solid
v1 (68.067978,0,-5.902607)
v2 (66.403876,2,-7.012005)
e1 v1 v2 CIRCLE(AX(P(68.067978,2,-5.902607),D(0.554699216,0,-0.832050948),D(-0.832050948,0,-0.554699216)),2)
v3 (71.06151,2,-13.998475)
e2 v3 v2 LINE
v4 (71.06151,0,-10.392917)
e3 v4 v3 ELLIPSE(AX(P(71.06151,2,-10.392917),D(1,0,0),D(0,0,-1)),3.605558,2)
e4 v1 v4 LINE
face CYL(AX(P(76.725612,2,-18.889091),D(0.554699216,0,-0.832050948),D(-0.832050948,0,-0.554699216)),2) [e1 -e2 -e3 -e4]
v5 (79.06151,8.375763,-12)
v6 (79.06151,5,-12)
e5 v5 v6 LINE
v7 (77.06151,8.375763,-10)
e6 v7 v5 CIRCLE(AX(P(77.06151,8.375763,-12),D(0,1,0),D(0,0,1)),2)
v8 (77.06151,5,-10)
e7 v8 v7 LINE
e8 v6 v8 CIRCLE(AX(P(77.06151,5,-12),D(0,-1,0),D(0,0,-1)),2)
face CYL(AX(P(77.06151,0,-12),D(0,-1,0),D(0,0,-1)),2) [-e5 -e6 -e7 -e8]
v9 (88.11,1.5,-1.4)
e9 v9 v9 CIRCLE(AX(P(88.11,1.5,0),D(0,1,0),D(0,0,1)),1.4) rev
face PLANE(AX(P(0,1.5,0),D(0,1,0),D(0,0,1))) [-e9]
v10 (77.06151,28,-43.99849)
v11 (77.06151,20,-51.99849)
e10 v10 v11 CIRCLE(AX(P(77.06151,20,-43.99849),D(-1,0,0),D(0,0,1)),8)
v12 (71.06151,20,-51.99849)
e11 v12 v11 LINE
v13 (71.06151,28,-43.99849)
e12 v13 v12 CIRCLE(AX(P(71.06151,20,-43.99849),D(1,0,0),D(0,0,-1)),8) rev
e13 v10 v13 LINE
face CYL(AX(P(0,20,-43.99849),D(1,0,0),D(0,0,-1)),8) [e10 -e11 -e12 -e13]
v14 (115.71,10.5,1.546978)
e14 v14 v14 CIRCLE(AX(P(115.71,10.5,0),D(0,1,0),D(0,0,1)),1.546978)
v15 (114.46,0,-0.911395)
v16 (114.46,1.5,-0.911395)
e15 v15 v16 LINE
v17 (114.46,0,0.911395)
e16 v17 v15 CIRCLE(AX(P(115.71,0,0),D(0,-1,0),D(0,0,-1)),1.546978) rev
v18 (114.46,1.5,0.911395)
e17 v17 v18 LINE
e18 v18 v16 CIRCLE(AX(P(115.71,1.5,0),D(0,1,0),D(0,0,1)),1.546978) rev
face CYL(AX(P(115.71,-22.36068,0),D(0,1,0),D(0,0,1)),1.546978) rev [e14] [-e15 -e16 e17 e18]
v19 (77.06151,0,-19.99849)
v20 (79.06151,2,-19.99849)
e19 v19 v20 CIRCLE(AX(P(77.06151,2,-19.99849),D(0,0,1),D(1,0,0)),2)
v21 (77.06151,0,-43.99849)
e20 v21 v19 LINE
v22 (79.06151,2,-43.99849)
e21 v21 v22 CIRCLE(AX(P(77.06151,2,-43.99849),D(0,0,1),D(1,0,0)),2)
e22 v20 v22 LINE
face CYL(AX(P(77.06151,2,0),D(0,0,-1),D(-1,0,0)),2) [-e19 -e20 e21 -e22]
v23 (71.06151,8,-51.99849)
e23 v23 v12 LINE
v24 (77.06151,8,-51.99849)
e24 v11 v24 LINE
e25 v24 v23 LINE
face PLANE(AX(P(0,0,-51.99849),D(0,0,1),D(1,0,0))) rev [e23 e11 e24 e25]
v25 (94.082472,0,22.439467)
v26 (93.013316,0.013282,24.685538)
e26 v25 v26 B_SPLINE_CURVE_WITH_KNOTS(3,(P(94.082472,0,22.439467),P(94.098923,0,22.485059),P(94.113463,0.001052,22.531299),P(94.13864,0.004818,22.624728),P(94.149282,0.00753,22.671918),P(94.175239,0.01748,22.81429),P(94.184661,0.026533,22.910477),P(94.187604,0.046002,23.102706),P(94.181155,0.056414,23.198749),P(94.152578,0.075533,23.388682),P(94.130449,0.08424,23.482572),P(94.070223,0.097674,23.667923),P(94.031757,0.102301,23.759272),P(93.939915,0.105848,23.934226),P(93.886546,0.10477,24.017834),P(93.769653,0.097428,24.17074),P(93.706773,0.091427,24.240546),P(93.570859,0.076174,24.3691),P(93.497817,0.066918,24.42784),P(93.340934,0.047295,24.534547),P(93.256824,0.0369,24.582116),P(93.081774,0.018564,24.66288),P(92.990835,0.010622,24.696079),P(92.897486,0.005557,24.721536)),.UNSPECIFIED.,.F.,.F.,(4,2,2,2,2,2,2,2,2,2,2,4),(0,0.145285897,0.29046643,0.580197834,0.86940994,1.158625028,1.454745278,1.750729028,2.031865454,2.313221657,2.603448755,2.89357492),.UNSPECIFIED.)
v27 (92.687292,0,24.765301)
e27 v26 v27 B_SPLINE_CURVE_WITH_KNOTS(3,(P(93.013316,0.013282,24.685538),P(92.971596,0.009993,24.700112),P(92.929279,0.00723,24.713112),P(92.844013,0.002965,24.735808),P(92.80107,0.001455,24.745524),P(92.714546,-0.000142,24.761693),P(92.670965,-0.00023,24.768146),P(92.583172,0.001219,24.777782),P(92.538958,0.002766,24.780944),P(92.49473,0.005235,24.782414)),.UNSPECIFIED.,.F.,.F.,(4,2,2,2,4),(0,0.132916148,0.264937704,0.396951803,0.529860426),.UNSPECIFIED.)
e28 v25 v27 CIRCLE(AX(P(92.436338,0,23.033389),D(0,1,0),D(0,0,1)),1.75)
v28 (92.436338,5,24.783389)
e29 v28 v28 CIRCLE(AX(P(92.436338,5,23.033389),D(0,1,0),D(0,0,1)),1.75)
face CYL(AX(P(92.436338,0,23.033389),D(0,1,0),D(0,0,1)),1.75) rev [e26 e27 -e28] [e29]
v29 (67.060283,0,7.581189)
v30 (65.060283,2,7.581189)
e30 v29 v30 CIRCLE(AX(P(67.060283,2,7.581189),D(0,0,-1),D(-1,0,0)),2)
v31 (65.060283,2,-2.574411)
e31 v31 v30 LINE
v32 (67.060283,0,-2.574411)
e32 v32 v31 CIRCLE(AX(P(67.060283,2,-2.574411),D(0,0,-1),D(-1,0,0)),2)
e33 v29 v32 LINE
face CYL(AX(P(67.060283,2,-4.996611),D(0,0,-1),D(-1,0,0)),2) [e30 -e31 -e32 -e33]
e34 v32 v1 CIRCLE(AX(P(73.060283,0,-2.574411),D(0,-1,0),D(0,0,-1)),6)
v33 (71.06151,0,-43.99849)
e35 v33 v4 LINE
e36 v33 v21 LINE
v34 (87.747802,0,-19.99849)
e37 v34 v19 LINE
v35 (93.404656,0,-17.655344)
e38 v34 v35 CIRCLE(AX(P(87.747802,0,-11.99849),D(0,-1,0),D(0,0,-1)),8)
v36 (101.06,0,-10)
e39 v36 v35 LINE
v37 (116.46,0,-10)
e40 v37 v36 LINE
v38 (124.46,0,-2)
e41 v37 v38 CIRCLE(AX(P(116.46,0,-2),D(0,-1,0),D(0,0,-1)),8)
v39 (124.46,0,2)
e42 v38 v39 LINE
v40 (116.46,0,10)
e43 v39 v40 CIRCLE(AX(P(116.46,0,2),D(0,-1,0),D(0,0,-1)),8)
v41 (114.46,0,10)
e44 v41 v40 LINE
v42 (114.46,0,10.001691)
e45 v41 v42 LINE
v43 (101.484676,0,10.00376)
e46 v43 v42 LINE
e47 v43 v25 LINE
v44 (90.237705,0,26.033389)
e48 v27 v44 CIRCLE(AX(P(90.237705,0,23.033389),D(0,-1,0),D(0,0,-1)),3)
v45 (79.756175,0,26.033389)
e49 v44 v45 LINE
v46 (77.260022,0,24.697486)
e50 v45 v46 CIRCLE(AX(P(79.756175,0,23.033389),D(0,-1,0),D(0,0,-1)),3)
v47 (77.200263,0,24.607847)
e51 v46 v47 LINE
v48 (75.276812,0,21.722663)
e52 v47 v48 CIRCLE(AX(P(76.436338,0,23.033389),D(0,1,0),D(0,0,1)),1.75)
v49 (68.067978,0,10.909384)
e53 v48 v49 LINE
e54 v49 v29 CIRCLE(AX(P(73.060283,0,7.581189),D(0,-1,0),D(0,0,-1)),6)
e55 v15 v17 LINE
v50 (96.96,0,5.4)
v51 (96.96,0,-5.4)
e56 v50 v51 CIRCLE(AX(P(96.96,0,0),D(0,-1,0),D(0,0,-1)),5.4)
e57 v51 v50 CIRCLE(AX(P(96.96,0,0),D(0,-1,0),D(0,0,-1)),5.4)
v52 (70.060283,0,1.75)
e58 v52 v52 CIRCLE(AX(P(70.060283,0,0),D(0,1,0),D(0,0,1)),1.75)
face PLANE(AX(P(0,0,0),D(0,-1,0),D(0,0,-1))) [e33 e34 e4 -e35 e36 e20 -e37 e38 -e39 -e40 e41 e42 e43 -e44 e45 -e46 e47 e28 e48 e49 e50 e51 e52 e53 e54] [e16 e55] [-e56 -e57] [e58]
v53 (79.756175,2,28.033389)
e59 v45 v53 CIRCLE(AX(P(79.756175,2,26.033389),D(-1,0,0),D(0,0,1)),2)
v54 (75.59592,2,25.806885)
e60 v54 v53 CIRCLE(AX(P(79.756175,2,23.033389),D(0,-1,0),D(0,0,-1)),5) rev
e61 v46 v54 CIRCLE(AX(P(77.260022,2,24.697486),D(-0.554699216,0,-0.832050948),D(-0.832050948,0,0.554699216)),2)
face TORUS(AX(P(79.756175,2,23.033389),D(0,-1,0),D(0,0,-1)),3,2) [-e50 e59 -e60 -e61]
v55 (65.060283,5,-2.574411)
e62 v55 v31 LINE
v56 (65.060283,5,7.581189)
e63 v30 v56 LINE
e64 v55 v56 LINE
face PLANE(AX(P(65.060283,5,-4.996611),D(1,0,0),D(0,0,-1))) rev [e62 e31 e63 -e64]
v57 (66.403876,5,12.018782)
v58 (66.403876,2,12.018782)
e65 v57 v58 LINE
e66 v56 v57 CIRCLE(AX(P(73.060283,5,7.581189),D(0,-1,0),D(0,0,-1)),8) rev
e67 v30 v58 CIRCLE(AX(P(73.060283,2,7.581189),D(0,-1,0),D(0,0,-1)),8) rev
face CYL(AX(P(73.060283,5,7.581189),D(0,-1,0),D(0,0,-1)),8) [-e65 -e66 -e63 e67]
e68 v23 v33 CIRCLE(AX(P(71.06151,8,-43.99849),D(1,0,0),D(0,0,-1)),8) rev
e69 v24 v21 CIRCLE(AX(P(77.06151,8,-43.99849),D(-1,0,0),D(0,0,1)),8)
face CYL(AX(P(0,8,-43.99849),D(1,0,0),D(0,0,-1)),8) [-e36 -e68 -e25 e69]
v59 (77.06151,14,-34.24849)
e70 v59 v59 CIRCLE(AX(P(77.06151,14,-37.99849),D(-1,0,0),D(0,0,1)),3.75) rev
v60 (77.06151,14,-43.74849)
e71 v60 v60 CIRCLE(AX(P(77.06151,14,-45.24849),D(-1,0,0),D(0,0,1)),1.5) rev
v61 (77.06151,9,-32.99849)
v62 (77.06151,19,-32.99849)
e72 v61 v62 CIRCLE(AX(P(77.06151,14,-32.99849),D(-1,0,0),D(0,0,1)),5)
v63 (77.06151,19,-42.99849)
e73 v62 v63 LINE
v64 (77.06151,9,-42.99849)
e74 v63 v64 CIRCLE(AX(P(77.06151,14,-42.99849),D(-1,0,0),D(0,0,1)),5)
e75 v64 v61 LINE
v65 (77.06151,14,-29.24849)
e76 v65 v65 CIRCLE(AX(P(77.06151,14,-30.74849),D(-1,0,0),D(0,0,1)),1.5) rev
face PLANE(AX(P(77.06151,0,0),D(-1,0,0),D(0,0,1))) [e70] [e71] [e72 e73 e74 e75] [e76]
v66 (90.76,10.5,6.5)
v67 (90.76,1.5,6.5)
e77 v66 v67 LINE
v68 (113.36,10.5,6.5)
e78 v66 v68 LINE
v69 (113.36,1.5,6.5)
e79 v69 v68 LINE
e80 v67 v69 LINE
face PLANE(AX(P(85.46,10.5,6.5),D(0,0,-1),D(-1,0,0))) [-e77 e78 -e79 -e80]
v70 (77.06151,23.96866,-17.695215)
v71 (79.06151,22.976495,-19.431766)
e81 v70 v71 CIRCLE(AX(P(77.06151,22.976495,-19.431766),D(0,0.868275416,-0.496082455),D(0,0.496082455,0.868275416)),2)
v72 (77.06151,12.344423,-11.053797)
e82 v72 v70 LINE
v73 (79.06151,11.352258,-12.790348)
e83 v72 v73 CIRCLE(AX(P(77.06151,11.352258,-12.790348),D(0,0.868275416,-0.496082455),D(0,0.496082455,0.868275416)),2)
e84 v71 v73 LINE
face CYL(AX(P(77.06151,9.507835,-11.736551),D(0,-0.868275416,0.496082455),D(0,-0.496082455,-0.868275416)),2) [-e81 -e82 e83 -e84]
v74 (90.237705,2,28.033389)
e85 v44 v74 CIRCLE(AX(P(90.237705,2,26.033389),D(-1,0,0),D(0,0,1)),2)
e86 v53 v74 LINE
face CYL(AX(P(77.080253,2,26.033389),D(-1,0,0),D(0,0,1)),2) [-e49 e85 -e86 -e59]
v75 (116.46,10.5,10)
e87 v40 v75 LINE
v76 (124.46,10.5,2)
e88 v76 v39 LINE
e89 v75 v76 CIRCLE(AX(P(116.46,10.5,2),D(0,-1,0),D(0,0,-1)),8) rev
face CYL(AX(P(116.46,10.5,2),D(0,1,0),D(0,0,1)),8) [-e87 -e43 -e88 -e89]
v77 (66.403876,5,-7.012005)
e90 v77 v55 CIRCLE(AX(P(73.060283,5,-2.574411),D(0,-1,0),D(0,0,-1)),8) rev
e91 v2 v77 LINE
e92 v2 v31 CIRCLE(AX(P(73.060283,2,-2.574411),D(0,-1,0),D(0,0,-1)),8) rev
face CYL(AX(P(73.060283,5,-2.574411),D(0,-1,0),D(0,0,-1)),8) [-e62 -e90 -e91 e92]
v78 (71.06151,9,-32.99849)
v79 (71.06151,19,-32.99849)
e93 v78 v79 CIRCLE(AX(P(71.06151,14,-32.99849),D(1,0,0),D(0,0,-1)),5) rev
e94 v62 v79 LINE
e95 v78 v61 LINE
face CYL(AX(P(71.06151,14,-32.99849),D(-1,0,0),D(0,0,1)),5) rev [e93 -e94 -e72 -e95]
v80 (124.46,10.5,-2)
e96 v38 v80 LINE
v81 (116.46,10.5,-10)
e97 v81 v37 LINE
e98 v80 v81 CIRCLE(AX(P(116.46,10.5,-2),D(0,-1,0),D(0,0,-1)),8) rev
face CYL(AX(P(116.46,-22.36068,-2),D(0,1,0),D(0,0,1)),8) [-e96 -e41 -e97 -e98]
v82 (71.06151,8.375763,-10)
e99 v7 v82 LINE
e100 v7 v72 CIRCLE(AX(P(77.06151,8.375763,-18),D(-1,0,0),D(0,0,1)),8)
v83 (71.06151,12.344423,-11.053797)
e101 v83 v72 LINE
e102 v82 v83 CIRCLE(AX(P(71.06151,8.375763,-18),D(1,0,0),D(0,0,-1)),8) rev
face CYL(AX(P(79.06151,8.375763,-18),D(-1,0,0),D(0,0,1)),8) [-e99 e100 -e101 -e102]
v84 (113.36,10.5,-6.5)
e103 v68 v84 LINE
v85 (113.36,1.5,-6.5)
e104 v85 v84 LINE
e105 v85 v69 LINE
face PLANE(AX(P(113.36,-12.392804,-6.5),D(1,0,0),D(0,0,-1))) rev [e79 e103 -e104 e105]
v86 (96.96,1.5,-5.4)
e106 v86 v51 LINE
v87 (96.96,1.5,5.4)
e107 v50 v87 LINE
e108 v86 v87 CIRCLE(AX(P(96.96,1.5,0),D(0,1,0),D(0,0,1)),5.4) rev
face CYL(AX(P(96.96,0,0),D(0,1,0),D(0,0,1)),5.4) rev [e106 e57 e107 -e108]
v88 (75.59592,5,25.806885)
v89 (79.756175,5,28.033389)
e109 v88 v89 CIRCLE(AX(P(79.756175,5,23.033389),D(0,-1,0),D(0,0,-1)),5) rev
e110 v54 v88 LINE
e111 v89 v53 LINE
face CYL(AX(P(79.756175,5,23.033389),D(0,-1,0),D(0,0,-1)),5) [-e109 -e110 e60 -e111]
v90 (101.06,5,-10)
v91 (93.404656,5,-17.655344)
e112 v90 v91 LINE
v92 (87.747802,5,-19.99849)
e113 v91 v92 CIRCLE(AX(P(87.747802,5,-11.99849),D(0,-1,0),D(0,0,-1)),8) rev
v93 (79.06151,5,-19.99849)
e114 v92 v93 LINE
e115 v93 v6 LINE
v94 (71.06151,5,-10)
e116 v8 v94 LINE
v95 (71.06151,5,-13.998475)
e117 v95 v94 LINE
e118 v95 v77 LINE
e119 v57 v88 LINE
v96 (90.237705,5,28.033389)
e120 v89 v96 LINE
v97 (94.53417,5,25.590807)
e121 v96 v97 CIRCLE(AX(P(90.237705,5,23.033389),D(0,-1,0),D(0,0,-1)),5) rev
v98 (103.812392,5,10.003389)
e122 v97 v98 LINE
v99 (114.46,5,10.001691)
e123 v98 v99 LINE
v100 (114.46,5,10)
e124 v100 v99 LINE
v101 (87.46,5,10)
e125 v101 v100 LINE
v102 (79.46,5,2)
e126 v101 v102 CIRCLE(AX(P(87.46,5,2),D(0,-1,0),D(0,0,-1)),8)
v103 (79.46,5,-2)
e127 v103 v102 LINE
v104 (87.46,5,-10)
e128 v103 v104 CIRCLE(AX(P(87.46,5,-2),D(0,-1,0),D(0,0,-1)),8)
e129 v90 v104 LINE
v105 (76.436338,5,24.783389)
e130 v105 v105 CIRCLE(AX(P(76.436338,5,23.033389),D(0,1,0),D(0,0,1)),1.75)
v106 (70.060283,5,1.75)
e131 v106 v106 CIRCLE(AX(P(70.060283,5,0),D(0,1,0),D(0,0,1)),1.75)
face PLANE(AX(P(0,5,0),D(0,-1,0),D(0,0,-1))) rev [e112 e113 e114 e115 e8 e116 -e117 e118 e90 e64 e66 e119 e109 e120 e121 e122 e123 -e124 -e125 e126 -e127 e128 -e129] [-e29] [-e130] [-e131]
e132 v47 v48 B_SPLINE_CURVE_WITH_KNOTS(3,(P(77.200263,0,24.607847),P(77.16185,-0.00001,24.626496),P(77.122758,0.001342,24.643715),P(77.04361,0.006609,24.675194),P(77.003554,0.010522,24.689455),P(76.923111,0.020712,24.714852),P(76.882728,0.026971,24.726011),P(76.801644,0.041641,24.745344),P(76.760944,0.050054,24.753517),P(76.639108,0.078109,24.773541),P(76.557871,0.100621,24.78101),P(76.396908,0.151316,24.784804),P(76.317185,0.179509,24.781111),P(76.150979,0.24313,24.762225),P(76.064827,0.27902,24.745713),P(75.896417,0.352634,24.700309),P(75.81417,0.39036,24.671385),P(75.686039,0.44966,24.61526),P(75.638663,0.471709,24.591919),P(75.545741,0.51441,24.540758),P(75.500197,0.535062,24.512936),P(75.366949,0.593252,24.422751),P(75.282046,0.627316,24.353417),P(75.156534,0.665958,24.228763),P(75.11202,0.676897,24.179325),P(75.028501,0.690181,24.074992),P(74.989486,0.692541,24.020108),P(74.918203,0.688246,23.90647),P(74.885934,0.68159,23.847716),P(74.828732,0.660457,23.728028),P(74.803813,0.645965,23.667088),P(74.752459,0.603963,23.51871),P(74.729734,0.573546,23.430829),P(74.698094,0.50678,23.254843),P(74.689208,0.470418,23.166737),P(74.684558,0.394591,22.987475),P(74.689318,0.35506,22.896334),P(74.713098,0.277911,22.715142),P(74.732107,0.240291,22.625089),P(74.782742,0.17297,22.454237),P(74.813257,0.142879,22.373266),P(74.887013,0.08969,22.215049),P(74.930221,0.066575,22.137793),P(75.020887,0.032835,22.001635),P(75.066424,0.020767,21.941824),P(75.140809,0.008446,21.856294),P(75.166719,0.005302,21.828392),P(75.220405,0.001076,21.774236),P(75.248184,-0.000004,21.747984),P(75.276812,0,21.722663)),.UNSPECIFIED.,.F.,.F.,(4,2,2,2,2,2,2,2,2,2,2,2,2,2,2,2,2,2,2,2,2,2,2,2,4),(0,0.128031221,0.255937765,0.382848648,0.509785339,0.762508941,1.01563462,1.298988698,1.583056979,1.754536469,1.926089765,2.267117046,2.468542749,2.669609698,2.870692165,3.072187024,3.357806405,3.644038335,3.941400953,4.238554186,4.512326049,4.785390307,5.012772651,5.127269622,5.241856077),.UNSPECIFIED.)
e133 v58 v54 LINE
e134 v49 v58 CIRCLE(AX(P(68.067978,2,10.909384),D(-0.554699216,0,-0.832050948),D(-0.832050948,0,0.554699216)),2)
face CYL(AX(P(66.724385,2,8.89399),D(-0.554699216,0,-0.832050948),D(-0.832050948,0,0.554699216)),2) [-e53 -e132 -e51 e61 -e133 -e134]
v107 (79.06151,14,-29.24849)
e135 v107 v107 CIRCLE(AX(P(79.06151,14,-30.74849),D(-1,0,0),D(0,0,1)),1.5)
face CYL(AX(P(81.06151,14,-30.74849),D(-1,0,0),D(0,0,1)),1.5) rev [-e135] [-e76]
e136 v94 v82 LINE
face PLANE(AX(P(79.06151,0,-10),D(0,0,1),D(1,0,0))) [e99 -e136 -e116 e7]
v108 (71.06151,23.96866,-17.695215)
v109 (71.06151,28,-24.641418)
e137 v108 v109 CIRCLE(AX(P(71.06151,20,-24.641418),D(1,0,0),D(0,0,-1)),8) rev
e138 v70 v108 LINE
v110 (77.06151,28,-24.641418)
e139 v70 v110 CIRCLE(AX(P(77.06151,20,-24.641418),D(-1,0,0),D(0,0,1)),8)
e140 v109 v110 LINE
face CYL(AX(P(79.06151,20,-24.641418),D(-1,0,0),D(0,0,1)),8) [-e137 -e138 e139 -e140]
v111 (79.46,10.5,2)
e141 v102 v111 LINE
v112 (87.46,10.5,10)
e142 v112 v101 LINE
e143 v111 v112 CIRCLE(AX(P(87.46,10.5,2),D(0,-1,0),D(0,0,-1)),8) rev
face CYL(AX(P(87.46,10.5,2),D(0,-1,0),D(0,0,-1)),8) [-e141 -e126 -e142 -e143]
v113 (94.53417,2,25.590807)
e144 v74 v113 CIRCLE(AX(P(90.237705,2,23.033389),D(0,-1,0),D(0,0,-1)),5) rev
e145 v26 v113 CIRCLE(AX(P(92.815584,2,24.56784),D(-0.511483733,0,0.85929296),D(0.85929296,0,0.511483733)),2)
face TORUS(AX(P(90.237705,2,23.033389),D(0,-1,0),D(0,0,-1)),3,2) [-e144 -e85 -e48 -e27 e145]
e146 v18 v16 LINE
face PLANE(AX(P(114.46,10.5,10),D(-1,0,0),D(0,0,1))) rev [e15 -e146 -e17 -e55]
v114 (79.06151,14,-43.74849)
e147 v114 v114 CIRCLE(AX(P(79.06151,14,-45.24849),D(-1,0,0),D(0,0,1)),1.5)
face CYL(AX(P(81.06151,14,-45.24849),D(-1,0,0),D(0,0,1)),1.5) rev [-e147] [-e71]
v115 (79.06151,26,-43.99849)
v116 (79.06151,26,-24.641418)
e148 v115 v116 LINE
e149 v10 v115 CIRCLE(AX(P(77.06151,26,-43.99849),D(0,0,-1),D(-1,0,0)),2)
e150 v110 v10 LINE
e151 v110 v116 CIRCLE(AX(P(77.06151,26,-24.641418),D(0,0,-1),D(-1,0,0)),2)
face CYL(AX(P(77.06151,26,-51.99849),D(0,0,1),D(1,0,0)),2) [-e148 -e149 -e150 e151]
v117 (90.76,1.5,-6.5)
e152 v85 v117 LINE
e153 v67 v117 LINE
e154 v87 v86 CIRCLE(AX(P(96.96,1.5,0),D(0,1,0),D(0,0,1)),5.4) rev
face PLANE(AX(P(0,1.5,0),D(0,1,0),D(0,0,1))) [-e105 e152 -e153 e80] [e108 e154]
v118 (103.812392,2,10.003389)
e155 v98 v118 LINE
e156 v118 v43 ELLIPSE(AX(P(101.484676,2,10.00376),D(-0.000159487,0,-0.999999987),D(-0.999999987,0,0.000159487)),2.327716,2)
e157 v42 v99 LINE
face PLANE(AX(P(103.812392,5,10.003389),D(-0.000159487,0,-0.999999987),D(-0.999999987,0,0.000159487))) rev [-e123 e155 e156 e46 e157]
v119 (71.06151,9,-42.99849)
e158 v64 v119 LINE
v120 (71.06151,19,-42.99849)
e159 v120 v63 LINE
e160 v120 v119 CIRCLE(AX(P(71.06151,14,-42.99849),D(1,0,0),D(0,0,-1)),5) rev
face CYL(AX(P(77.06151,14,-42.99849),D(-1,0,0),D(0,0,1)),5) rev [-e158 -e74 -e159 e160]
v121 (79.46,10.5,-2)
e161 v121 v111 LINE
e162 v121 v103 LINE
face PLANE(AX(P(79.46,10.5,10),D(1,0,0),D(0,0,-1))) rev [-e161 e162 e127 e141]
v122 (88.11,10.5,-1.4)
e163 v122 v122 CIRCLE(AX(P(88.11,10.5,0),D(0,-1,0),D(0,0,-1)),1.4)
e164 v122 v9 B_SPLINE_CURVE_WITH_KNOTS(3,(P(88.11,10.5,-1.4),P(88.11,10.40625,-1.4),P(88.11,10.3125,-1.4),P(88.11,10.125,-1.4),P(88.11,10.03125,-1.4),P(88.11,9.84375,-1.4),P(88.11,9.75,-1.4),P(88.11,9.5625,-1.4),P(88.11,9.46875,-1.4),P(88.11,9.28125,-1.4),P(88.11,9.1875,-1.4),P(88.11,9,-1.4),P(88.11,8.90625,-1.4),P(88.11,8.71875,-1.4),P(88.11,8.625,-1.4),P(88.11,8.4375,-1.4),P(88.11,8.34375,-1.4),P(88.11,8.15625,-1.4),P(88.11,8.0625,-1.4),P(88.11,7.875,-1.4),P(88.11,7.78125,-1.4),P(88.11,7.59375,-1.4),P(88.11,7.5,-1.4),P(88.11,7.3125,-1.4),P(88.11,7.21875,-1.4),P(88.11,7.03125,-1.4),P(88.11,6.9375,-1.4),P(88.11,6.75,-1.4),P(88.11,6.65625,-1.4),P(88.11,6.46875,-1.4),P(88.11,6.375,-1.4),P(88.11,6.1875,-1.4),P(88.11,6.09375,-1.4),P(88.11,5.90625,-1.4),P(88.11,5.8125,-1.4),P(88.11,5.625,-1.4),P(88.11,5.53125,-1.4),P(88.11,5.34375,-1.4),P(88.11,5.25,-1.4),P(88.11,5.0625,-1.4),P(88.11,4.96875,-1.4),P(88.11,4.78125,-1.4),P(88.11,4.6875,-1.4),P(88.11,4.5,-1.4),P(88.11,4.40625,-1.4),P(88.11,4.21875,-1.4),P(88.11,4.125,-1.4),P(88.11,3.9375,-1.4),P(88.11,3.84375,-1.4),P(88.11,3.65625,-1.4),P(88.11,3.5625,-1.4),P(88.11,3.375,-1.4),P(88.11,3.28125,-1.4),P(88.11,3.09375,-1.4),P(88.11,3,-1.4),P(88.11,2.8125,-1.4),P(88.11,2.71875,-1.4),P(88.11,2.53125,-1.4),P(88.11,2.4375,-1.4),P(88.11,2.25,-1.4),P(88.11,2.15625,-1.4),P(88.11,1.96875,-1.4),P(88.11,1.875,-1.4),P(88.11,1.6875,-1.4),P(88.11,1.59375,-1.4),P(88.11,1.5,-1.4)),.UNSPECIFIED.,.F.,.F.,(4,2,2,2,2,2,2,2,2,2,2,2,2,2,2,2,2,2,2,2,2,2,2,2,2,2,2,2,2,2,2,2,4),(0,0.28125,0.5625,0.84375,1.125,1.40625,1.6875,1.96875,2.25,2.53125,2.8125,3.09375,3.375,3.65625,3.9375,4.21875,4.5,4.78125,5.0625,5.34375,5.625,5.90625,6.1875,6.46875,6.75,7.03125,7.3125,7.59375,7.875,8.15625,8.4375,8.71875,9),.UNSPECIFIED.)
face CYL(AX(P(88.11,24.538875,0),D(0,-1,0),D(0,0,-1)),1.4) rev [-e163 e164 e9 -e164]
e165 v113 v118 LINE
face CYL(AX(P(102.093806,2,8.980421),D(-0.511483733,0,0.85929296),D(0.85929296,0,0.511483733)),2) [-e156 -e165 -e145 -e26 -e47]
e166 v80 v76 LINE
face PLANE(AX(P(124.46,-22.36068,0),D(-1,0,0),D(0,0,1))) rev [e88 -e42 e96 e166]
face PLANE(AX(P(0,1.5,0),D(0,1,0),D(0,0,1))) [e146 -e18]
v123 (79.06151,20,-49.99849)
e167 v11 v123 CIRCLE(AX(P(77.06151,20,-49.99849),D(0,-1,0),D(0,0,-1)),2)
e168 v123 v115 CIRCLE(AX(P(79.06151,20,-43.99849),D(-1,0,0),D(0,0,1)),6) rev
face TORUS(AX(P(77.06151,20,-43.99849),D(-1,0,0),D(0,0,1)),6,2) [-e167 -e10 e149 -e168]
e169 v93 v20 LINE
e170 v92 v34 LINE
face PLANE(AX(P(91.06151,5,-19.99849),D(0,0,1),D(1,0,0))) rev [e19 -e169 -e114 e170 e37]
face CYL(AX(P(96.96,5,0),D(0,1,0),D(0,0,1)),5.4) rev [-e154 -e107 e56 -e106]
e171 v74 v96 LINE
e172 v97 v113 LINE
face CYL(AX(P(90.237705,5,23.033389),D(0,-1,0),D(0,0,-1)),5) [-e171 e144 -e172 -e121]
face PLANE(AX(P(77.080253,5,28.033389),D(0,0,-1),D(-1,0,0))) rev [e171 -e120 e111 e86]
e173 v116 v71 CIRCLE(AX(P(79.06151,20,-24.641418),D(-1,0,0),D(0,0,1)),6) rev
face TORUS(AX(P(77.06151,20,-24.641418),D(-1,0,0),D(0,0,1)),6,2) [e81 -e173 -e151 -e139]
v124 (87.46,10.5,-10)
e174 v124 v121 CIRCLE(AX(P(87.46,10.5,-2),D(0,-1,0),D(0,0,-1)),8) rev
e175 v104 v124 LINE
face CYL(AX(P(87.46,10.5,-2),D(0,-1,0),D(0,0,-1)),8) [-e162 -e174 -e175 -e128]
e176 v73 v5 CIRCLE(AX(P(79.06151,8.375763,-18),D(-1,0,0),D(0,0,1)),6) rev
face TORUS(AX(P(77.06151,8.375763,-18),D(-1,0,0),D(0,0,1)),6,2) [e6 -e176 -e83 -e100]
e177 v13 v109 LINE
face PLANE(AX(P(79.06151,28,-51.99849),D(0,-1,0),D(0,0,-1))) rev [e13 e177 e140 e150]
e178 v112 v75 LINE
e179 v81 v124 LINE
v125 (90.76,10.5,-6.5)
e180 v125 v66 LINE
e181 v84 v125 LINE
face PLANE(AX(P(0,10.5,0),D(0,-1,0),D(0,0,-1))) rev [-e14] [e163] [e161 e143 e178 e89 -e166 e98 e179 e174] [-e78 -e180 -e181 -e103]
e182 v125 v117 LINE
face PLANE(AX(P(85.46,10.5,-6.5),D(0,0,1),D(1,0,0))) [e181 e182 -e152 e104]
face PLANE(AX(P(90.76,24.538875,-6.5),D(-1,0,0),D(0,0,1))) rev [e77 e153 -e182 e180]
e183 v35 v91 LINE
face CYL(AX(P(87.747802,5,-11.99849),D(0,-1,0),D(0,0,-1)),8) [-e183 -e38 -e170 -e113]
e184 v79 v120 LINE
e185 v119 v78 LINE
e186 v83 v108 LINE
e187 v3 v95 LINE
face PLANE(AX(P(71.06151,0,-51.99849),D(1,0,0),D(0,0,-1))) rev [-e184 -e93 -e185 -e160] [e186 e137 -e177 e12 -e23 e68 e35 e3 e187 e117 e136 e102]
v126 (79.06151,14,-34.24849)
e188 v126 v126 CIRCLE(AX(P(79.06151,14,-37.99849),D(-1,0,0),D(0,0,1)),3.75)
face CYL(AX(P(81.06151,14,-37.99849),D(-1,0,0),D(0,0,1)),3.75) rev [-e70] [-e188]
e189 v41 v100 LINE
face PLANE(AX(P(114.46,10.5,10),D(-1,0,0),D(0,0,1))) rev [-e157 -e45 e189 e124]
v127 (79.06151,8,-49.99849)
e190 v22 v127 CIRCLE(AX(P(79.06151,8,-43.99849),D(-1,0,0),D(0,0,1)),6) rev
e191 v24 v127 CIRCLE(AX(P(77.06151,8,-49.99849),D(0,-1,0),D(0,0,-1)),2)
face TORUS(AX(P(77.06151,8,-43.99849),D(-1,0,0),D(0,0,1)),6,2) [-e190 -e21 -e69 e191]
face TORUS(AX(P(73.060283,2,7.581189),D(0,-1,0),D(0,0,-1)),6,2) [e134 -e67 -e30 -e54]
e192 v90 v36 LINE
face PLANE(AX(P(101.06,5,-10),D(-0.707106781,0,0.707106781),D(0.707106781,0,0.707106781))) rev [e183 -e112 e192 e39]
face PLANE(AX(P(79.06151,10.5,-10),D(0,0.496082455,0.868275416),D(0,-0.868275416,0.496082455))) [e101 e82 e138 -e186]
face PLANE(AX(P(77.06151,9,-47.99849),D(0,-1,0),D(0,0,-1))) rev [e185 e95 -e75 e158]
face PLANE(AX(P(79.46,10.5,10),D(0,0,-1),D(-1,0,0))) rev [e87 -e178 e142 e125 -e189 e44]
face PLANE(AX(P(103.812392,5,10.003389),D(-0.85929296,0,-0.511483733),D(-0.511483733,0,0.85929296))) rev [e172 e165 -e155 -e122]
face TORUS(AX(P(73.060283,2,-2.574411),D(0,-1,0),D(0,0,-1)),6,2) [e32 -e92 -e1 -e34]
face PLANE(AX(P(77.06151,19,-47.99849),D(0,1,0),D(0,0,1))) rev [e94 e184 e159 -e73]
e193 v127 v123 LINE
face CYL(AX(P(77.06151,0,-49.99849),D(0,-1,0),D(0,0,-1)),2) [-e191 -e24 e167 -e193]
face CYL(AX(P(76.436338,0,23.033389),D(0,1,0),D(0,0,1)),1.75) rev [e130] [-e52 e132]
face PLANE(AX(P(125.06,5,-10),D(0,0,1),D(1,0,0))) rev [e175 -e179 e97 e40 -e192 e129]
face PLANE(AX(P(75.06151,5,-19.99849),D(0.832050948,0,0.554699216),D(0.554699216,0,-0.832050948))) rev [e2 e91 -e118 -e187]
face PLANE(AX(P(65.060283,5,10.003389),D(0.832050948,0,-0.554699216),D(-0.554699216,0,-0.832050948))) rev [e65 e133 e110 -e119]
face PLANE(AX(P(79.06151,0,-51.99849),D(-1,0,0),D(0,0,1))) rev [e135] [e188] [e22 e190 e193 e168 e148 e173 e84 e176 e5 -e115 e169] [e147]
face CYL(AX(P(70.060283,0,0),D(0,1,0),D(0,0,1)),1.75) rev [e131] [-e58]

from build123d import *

# Parameters (mm, degrees)
BOSS_EXTRUDE1_DEPTH  = 5
SKETCH4_W            = 10.8
SKETCH4_H            = 10.8
SKETCH4_R            = 1.75
CUT_EXTRUDE1_DEPTH   = 129.260962426
FILLET1_R            = 5.4
FILLET2_R            = 5.4
FILLET3_R            = 10.000797
SKETCH5_W            = 35
SKETCH5_H            = 20
SKETCH5_W_2          = 23
SKETCH5_H_2          = 13
BOSS_EXTRUDE2_DEPTH  = 5.5
SKETCH6_W            = 23
SKETCH6_H            = 13
CUT_EXTRUDE2_DEPTH   = 3.5
CUT_EXTRUDE6_DEPTH   = 129.28142688
SKETCH8_W            = 8
SKETCH8_H            = 28
BOSS_EXTRUDE3_DEPTH  = 32
SKETCH9_R            = 2.5
SKETCH9_R_2          = 1.3
CUT_EXTRUDE7_DEPTH   = 69.854164991
FILLET4_R            = 8
BOSS_EXTRUDE9_DEPTH  = 8
SKETCH11_W           = 14
SKETCH11_H           = 7
CUT_EXTRUDE8_DEPTH   = 7
FILLET5_R            = 3.5
FILLET6_R            = 3.5
SKETCH12_W           = 5.3
SKETCH12_H           = 13
SKETCH12_R           = 1.4
BOSS_EXTRUDE11_DEPTH = 9
BOSS_EXTRUDE12_DEPTH = 10.5
SKETCH14_W           = 4.9
SKETCH14_H           = 13
CUT_EXTRUDE9_DEPTH   = 9
SKETCH15_R           = 1.546978048
CUT_EXTRUDE10_DEPTH  = 9
FILLET7_R            = 8
FILLET8_R            = 5
FILLET10_R           = 8
FILLET11_R           = 8
FILLET12_R           = 8
FILLET13_R           = 8
FILLET16_R           = 2
FILLET22_R           = 2
SKETCH17_W           = 21.644078019
SKETCH17_H           = 16.078457957
BOSS_EXTRUDE13_DEPTH = 8
SKETCH19_R           = 3.75
SKETCH19_R_2         = 1.5
CUT_EXTRUDE11_DEPTH  = 10
SKETCH20_W           = 20
SKETCH20_H           = 10
CUT_EXTRUDE12_DEPTH  = 6
FILLET23_R           = 5
FILLET24_R           = 5


# Some blends are built 0.0001 mm under size
with BuildPart() as part:
    # Sketch2 → Boss-Extrude1 (new body)
    with BuildSketch(Plane(origin=(0, 0, 0), x_dir=(1, 0, 0), z_dir=(0, 1, 0))):
        Polygon((125.06, 10), (125.06, -10), (103.812391816, -10.003388708), (93.080252563, -28.033388708), (77.080252563, -28.033388708), (65.060283257, -10.003388708), (65.060283257, 4.996611292), (75.061510114, 19.998489886), (91.061510114, 19.998489886), (101.06, 10), align=None)
    extrude(amount=BOSS_EXTRUDE1_DEPTH)

    # Sketch4 → Cut-Extrude1 (cut, through all)
    with BuildSketch(Plane(origin=(0, 5, 0), x_dir=(1, 0, 0), z_dir=(0, 1, 0))):
        with Locations((96.96, 0)):
            Rectangle(SKETCH4_W, SKETCH4_H)
        with Locations(Location((70.060283257, 0, 0), (0, 0, 270))):
            Circle(SKETCH4_R)
        with Locations(Location((76.436337536, -23.033388708, 0), (0, 0, 270))):
            Circle(SKETCH4_R)
        with Locations(Location((92.436337536, -23.033388708, 0), (0, 0, 270))):
            Circle(SKETCH4_R)
    extrude(amount=-CUT_EXTRUDE1_DEPTH, mode=Mode.SUBTRACT)

    # Fillet1
    fillet1_edges = [part.edges().sort_by_distance(p)[0] for p in [
        (91.56, 2.5, 5.4),
        (91.56, 2.5, -5.4),
    ]]
    fillet(fillet1_edges, radius=FILLET1_R - 0.0001)  # a hair under: the kernel refuses the full size

    # Fillet2
    # the kernel refuses this fillet: 5.4 mm, written as the material it adds along each edge
    with BuildSketch(Plane(origin=(102.36, 5, -5.4), x_dir=(0, 0, 1), z_dir=(0, -1, 0)), Plane(origin=(102.36, 5, 5.4), x_dir=(-1, 0, 0), z_dir=(0, -1, 0))) as fillet2_piece_1:
        with BuildLine():
            CenterArc((FILLET2_R, FILLET2_R), FILLET2_R, 180, 90)
            Line((0, FILLET2_R), (0, 0))
            Line((0, 0), (FILLET2_R, 0))
        make_face()
    extrude(amount=5)
    # the kernel refuses this fillet: 5.4 mm, written as the material it takes off along each edge

    # Fillet3
    fillet3_edges = [part.edges().sort_by_distance(p)[0] for p in [
        (125.06, 2.5, -10),
        (125.06, 2.5, 10),
    ]]
    fillet(fillet3_edges, radius=FILLET3_R)

    # Sketch5 → Boss-Extrude2 (add)
    with BuildSketch(Plane(origin=(0, 5, 0), x_dir=(1, 0, 0), z_dir=(0, 1, 0))):
        with Locations((96.96, 0)):
            Rectangle(SKETCH5_W, SKETCH5_H)
        with Locations((96.96, 0)):
            Rectangle(SKETCH5_W_2, SKETCH5_H_2, mode=Mode.SUBTRACT)
    extrude(amount=BOSS_EXTRUDE2_DEPTH)

    # Sketch6 → Cut-Extrude2 (cut)
    with BuildSketch(Plane(origin=(0, 5, 0), x_dir=(1, 0, 0), z_dir=(0, 1, 0))):
        with Locations((96.96, 0)):
            Rectangle(SKETCH6_W, SKETCH6_H)
    extrude(amount=-CUT_EXTRUDE2_DEPTH, mode=Mode.SUBTRACT)

    # Sketch7 → Cut-Extrude6 (cut, through all)
    with BuildSketch(Plane(origin=(0, 5, 0), x_dir=(1, 0, 0), z_dir=(0, 1, 0))):
        with BuildLine():
            Line((115.06079756, -10.001594738), (114.46, -10.001690558))
            Line((114.46, -10.001690558), (114.46, -12.384708422))
            Line((114.46, -12.384708422), (131.347766417, -12.384708422))
            Line((131.347766417, -12.384708422), (131.347766417, 10))
            Line((131.347766417, 10), (115.059202567, 10))
            ThreePointArc((115.059202567, 10), (125.059999968, 6.4e-08), (115.06079756, -10.001594738))
        make_face()
        with BuildLine():
            Line((114.46, 10), (114.46, -10))
            Line((114.46, -10), (114.46, -10.001690558))
            Line((114.46, -10.001690558), (115.06079756, -10.001594738))
            ThreePointArc((115.06079756, -10.001594738), (125.059999968, 6.4e-08), (115.059202567, 10))
            Line((115.059202567, 10), (114.46, 10))
        make_face()
    extrude(amount=-CUT_EXTRUDE6_DEPTH, mode=Mode.SUBTRACT)

    # Sketch8 → Boss-Extrude3 (add)
    with BuildSketch(Plane(origin=(0, 0, -19.998489886), x_dir=(-1, 0, 0), z_dir=(0, 0, -1))):
        with Locations((-75.061510114, 14)):
            Rectangle(SKETCH8_W, SKETCH8_H)
    extrude(amount=BOSS_EXTRUDE3_DEPTH)

    # Sketch9 → Cut-Extrude7 (cut, through all)
    with BuildSketch(Plane(origin=(79.061510114, 0, 0), x_dir=(0, 0, -1), z_dir=(1, 0, 0))):
        with Locations((37.998489886, 14)):
            Circle(SKETCH9_R)
        with Locations((33.498489886, 14)):
            Circle(SKETCH9_R_2)
        with Locations((42.498489886, 14)):
            Circle(SKETCH9_R_2)
    extrude(amount=-CUT_EXTRUDE7_DEPTH, mode=Mode.SUBTRACT)

    # Fillet4
    fillet4_edges = [part.edges().sort_by_distance(p)[0] for p in [
        (75.061510114, 0, -51.998489886),
        (75.061510114, 28, -51.998489886),
    ]]
    fillet(fillet4_edges, radius=FILLET4_R)

    # Sketch10 → Boss-Extrude9 (add)
    with BuildSketch(Plane.ZY.offset(-71.061510114)):
        Polygon((-19.998489886, 28), (-19.998489886, 0), (-10, 0), (-10, 10.5), align=None)
    extrude(amount=-BOSS_EXTRUDE9_DEPTH)

    # Sketch11 → Cut-Extrude8 (cut)
    with BuildSketch(Plane.ZY.offset(-71.061510114)):
        with Locations((-37.998489886, 14)):
            Rectangle(SKETCH11_W, SKETCH11_H)
    extrude(amount=-CUT_EXTRUDE8_DEPTH, mode=Mode.SUBTRACT)

    # Fillet5
    fillet5_edges = [part.edges().sort_by_distance(p)[0] for p in [
        (74.561510114, 10.5, -44.998489886),
        (74.561510114, 17.5, -44.998489886),
    ]]
    fillet(fillet5_edges, radius=FILLET5_R - 0.0001)  # a hair under: the kernel refuses the full size

    # Fillet6
    fillet6_edges = [part.edges().sort_by_distance(p)[0] for p in [
        (74.561510114, 17.5, -30.998489886),
        (74.561510114, 10.5, -30.998489886),
    ]]
    fillet(fillet6_edges, radius=FILLET6_R - 0.0001)  # a hair under: the kernel refuses the full size

    # Sketch12 → Boss-Extrude11 (add)
    with BuildSketch(Plane(origin=(0, 1.5, 0), x_dir=(1, 0, 0), z_dir=(0, 1, 0))):
        with Locations((88.11, 0)):
            Rectangle(SKETCH12_W, SKETCH12_H)
        with Locations(Location((88.11, 0, 0), (0, 0, 90))):
            Circle(SKETCH12_R, mode=Mode.SUBTRACT)
    extrude(amount=BOSS_EXTRUDE11_DEPTH)

    # Sketch13 → Boss-Extrude12 (add)
    with BuildSketch(Plane(origin=(0, 10.5, 0), x_dir=(1, 0, 0), z_dir=(0, 1, 0))):
        with BuildLine():
            Line((124.46, 10), (114.46, 10))
            Line((114.46, 10), (114.46, 0.911395129))
            ThreePointArc((114.46, 0.911395129), (116.189279939, 1.470860911), (117.256978048, 0))
            ThreePointArc((117.256978048, 0), (116.189279939, -1.470860911), (114.46, -0.911395129))
            Line((114.46, -0.911395129), (114.46, -10))
            Line((114.46, -10), (124.46, -10))
            Line((124.46, -10), (124.46, 10))
        make_face()
    extrude(amount=-BOSS_EXTRUDE12_DEPTH)

    # Sketch14 → Cut-Extrude9 (cut)
    with BuildSketch(Plane(origin=(0, 10.5, 0), x_dir=(1, 0, 0), z_dir=(0, 1, 0))):
        with Locations((110.91, 0)):
            Rectangle(SKETCH14_W, SKETCH14_H)
    extrude(amount=-CUT_EXTRUDE9_DEPTH, mode=Mode.SUBTRACT)

    # Sketch15 → Cut-Extrude10 (cut)
    with BuildSketch(Plane(origin=(0, 10.5, 0), x_dir=(1, 0, 0), z_dir=(0, 1, 0))):
        with Locations(Location((115.71, 0, 0), (0, 0, 270))):
            Circle(SKETCH15_R)
    extrude(amount=-CUT_EXTRUDE10_DEPTH, mode=Mode.SUBTRACT)

    # Fillet7
    fillet7_edges = [part.edges().sort_by_distance(p)[0] for p in [
        (124.46, 5.25, -10),
        (124.46, 5.25, 10),
    ]]
    fillet(fillet7_edges, radius=FILLET7_R)

    # Fillet8
    fillet8_edges = [part.edges().sort_by_distance(p)[0] for p in [
        (93.080252563, 2.5, 28.033388708),
        (77.080252563, 2.5, 28.033388708),
    ]]
    fillet(fillet8_edges, radius=FILLET8_R)

    # Fillet10
    fillet10_edges = [part.edges().sort_by_distance(p)[0] for p in [
        (65.060283257, 2.5, 10.003388708),
        (65.060283257, 2.5, -4.996611292),
    ]]
    fillet(fillet10_edges, radius=FILLET10_R)

    # Fillet11
    fillet11_edges = [part.edges().sort_by_distance(p)[0] for p in [
        (75.061510114, 28, -19.998489886),
        (75.061510114, 10.5, -10),
    ]]
    fillet(fillet11_edges, radius=FILLET11_R)

    # Fillet12
    fillet12_edges = [part.edges().sort_by_distance(p)[0] for p in [
        (79.46, 7.75, -10),
        (79.46, 7.75, 10),
    ]]
    fillet(fillet12_edges, radius=FILLET12_R)

    # Fillet13
    fillet13_edges = [part.edges().sort_by_distance(p)[0] for p in [
        (91.061510114, 2.5, -19.998489886),
    ]]
    fillet(fillet13_edges, radius=FILLET13_R)

    # Fillet16
    # the kernel refuses this fillet: 2 mm, written as the material it takes off along each edge
    with BuildSketch(Plane(origin=(66.403875672, 0, -7.012005062), x_dir=(0, 1, 0), z_dir=(0.5546992156114069, 0, -0.8320509480795573))) as fillet16_piece_1_section:
        with BuildLine():
            CenterArc((FILLET16_R, FILLET16_R), FILLET16_R, 180, 90)
            Line((0, FILLET16_R), (0, 0))
            Line((0, 0), (FILLET16_R, 0))
        make_face()
    fillet16_piece_1 = extrude(amount=13.396684746, mode=Mode.PRIVATE)
    fillet16_piece_1 = split(fillet16_piece_1, bisect_by=Plane(origin=(71.061510114, 0.474136614, -10.014110319), z_dir=(-1, 0, 0)), keep=Keep.TOP, mode=Mode.PRIVATE)
    add(fillet16_piece_1, mode=Mode.SUBTRACT)
    with BuildSketch(Plane(origin=(90.237704737, 0, 28.033388708), x_dir=(0, 1, 0), z_dir=(-1, 0, 0))) as fillet16_piece_2:
        with BuildLine():
            CenterArc((FILLET16_R, FILLET16_R), FILLET16_R, 180, 90)
            Line((0, FILLET16_R), (0, 0))
            Line((0, 0), (FILLET16_R, 0))
        make_face()
    extrude(amount=10.481529591, mode=Mode.SUBTRACT)
    with BuildSketch(Plane(origin=(106.369810481, 0, 5.706923908), x_dir=(0, 1, 0), z_dir=(-0.5114837329274393, 0, 0.8592929599098389))) as fillet16_piece_3_section:
        with BuildLine():
            CenterArc((FILLET16_R, FILLET16_R), FILLET16_R, 180, 90)
            Line((0, FILLET16_R), (0, 0))
            Line((0, 0), (FILLET16_R, 0))
        make_face()
    fillet16_piece_3 = extrude(amount=23.139818888, mode=Mode.PRIVATE)
    fillet16_piece_3 = split(fillet16_piece_3, bisect_by=Plane(origin=(98.720290848, 0.456449774, 10.00420083), z_dir=(0.00015948655604851523, 0, 0.9999999872820192)), keep=Keep.TOP, mode=Mode.PRIVATE)
    add(fillet16_piece_3, mode=Mode.SUBTRACT)
    with BuildSketch(Plane(origin=(90.237704737, 0, 23.033388708), x_dir=(0.8592929599098394, 0, 0.5114837329274385), z_dir=(0.5114837329274385, 0, -0.8592929599098394))) as fillet16_piece_4:
        with BuildLine():
            CenterArc((5 - FILLET16_R, -FILLET16_R), FILLET16_R, 0, 90)
            Line((5 - FILLET16_R, 0), (5, 0))
            Line((5, 0), (5, -FILLET16_R))
        make_face()
    revolve(axis=Axis((90.237704737, 0, 23.033388708), (0, -1, 0)), revolution_arc=59.237288923, mode=Mode.SUBTRACT)
    with BuildSketch(Plane(origin=(79.756175146, 0, 23.033388708), x_dir=(0, 0, 1), z_dir=(1, 0, 0))) as fillet16_piece_5:
        with BuildLine():
            CenterArc((5 - FILLET16_R, -FILLET16_R), FILLET16_R, 0, 90)
            Line((5 - FILLET16_R, 0), (5, 0))
            Line((5, 0), (5, -FILLET16_R))
        make_face()
    revolve(axis=Axis((79.756175146, 0, 23.033388708), (0, -1, 0)), revolution_arc=56.31, mode=Mode.SUBTRACT)
    with BuildSketch(Plane(origin=(75.595920406, 0, 25.806884786), x_dir=(0, 1, 0), z_dir=(-0.5546992156114031, 0, -0.8320509480795597))) as fillet16_piece_6:
        with BuildLine():
            CenterArc((FILLET16_R, FILLET16_R), FILLET16_R, 180, 90)
            Line((0, FILLET16_R), (0, 0))
            Line((0, 0), (FILLET16_R, 0))
        make_face()
    extrude(amount=16.571223602, mode=Mode.SUBTRACT)
    with BuildSketch(Plane(origin=(65.060283257, 0, 7.581188752), x_dir=(0, 1, 0), z_dir=(0, 0, -1))) as fillet16_piece_7:
        with BuildLine():
            CenterArc((FILLET16_R, FILLET16_R), FILLET16_R, 180, 90)
            Line((0, FILLET16_R), (0, 0))
            Line((0, 0), (FILLET16_R, 0))
        make_face()
    extrude(amount=10.155600089, mode=Mode.SUBTRACT)
    with BuildSketch(Plane(origin=(73.060283257, 0, -2.574411337), x_dir=(-1, 0, 0), z_dir=(0, 0, 1))) as fillet16_piece_8:
        with BuildLine():
            CenterArc((8 - FILLET16_R, -FILLET16_R), FILLET16_R, 0, 90)
            Line((8 - FILLET16_R, 0), (8, 0))
            Line((8, 0), (8, -FILLET16_R))
        make_face()
    revolve(axis=Axis((73.060283257, 0, -2.574411337), (0, -1, 0)), revolution_arc=33.69, mode=Mode.SUBTRACT)
    with BuildSketch(Plane(origin=(73.060283257, 0, 7.581188752), x_dir=(-0.83205094807956, 0, 0.5546992156114029), z_dir=(0.5546992156114029, 0, 0.83205094807956))) as fillet16_piece_9:
        with BuildLine():
            CenterArc((8 - FILLET16_R, -FILLET16_R), FILLET16_R, 0, 90)
            Line((8 - FILLET16_R, 0), (8, 0))
            Line((8, 0), (8, -FILLET16_R))
        make_face()
    revolve(axis=Axis((73.060283257, 0, 7.581188752), (0, -1, 0)), revolution_arc=33.69, mode=Mode.SUBTRACT)

    # Fillet22
    fillet22_edges = [part.edges().sort_by_distance(p)[0] for p in [
        (79.061510114, 14, -51.998489886),
        (79.061510114, 0, -31.998489886),
        (79.061510114, 28, -34.319953955),
        (79.061510114, 25.656854249, -49.655344135),
        (79.061510114, 2.343145751, -49.655344135),
        (79.061510114, 6.687881533, -10),
        (79.061510114, 18.156541174, -14.374505685),
        (79.061510114, 26.919150133, -20.625778419),
        (79.061510114, 10.42885505, -10.267936025),
    ]]
    fillet(fillet22_edges, radius=FILLET22_R)

    # Sketch17 → Boss-Extrude13 (add)
    with BuildSketch(Plane(origin=(79.061510114, 0, 0), x_dir=(0, 0, -1), z_dir=(1, 0, 0))):
        with Locations((36.586124991, 14.06004495)):
            Rectangle(SKETCH17_W, SKETCH17_H)
    extrude(amount=-BOSS_EXTRUDE13_DEPTH)

    # Sketch19 → Cut-Extrude11 (cut)
    with BuildSketch(Plane.ZY.offset(-71.061510114)):
        with Locations((-37.998489886, 14)):
            Circle(SKETCH19_R)
        with Locations((-30.748489886, 14)):
            Circle(SKETCH19_R_2)
        with Locations((-45.248489886, 14)):
            Circle(SKETCH19_R_2)
    extrude(amount=-CUT_EXTRUDE11_DEPTH, mode=Mode.SUBTRACT)

    # Sketch20 → Cut-Extrude12 (cut)
    with BuildSketch(Plane.ZY.offset(-71.061510114)):
        with Locations((-37.998489886, 14)):
            Rectangle(SKETCH20_W, SKETCH20_H)
    extrude(amount=-CUT_EXTRUDE12_DEPTH, mode=Mode.SUBTRACT)

    # Fillet23
    fillet23_edges = [part.edges().sort_by_distance(p)[0] for p in [
        (74.061510114, 19, -27.998489886),
        (74.061510114, 9, -27.998489886),
    ]]
    fillet(fillet23_edges, radius=FILLET23_R - 0.0001)  # a hair under: the kernel refuses the full size

    # Fillet24
    fillet24_edges = [part.edges().sort_by_distance(p)[0] for p in [
        (74.061510114, 9, -47.998489886),
        (74.061510114, 19, -47.998489886),
    ]]
    fillet(fillet24_edges, radius=FILLET24_R - 0.0001)  # a hair under: the kernel refuses the full size


solid = part.part
